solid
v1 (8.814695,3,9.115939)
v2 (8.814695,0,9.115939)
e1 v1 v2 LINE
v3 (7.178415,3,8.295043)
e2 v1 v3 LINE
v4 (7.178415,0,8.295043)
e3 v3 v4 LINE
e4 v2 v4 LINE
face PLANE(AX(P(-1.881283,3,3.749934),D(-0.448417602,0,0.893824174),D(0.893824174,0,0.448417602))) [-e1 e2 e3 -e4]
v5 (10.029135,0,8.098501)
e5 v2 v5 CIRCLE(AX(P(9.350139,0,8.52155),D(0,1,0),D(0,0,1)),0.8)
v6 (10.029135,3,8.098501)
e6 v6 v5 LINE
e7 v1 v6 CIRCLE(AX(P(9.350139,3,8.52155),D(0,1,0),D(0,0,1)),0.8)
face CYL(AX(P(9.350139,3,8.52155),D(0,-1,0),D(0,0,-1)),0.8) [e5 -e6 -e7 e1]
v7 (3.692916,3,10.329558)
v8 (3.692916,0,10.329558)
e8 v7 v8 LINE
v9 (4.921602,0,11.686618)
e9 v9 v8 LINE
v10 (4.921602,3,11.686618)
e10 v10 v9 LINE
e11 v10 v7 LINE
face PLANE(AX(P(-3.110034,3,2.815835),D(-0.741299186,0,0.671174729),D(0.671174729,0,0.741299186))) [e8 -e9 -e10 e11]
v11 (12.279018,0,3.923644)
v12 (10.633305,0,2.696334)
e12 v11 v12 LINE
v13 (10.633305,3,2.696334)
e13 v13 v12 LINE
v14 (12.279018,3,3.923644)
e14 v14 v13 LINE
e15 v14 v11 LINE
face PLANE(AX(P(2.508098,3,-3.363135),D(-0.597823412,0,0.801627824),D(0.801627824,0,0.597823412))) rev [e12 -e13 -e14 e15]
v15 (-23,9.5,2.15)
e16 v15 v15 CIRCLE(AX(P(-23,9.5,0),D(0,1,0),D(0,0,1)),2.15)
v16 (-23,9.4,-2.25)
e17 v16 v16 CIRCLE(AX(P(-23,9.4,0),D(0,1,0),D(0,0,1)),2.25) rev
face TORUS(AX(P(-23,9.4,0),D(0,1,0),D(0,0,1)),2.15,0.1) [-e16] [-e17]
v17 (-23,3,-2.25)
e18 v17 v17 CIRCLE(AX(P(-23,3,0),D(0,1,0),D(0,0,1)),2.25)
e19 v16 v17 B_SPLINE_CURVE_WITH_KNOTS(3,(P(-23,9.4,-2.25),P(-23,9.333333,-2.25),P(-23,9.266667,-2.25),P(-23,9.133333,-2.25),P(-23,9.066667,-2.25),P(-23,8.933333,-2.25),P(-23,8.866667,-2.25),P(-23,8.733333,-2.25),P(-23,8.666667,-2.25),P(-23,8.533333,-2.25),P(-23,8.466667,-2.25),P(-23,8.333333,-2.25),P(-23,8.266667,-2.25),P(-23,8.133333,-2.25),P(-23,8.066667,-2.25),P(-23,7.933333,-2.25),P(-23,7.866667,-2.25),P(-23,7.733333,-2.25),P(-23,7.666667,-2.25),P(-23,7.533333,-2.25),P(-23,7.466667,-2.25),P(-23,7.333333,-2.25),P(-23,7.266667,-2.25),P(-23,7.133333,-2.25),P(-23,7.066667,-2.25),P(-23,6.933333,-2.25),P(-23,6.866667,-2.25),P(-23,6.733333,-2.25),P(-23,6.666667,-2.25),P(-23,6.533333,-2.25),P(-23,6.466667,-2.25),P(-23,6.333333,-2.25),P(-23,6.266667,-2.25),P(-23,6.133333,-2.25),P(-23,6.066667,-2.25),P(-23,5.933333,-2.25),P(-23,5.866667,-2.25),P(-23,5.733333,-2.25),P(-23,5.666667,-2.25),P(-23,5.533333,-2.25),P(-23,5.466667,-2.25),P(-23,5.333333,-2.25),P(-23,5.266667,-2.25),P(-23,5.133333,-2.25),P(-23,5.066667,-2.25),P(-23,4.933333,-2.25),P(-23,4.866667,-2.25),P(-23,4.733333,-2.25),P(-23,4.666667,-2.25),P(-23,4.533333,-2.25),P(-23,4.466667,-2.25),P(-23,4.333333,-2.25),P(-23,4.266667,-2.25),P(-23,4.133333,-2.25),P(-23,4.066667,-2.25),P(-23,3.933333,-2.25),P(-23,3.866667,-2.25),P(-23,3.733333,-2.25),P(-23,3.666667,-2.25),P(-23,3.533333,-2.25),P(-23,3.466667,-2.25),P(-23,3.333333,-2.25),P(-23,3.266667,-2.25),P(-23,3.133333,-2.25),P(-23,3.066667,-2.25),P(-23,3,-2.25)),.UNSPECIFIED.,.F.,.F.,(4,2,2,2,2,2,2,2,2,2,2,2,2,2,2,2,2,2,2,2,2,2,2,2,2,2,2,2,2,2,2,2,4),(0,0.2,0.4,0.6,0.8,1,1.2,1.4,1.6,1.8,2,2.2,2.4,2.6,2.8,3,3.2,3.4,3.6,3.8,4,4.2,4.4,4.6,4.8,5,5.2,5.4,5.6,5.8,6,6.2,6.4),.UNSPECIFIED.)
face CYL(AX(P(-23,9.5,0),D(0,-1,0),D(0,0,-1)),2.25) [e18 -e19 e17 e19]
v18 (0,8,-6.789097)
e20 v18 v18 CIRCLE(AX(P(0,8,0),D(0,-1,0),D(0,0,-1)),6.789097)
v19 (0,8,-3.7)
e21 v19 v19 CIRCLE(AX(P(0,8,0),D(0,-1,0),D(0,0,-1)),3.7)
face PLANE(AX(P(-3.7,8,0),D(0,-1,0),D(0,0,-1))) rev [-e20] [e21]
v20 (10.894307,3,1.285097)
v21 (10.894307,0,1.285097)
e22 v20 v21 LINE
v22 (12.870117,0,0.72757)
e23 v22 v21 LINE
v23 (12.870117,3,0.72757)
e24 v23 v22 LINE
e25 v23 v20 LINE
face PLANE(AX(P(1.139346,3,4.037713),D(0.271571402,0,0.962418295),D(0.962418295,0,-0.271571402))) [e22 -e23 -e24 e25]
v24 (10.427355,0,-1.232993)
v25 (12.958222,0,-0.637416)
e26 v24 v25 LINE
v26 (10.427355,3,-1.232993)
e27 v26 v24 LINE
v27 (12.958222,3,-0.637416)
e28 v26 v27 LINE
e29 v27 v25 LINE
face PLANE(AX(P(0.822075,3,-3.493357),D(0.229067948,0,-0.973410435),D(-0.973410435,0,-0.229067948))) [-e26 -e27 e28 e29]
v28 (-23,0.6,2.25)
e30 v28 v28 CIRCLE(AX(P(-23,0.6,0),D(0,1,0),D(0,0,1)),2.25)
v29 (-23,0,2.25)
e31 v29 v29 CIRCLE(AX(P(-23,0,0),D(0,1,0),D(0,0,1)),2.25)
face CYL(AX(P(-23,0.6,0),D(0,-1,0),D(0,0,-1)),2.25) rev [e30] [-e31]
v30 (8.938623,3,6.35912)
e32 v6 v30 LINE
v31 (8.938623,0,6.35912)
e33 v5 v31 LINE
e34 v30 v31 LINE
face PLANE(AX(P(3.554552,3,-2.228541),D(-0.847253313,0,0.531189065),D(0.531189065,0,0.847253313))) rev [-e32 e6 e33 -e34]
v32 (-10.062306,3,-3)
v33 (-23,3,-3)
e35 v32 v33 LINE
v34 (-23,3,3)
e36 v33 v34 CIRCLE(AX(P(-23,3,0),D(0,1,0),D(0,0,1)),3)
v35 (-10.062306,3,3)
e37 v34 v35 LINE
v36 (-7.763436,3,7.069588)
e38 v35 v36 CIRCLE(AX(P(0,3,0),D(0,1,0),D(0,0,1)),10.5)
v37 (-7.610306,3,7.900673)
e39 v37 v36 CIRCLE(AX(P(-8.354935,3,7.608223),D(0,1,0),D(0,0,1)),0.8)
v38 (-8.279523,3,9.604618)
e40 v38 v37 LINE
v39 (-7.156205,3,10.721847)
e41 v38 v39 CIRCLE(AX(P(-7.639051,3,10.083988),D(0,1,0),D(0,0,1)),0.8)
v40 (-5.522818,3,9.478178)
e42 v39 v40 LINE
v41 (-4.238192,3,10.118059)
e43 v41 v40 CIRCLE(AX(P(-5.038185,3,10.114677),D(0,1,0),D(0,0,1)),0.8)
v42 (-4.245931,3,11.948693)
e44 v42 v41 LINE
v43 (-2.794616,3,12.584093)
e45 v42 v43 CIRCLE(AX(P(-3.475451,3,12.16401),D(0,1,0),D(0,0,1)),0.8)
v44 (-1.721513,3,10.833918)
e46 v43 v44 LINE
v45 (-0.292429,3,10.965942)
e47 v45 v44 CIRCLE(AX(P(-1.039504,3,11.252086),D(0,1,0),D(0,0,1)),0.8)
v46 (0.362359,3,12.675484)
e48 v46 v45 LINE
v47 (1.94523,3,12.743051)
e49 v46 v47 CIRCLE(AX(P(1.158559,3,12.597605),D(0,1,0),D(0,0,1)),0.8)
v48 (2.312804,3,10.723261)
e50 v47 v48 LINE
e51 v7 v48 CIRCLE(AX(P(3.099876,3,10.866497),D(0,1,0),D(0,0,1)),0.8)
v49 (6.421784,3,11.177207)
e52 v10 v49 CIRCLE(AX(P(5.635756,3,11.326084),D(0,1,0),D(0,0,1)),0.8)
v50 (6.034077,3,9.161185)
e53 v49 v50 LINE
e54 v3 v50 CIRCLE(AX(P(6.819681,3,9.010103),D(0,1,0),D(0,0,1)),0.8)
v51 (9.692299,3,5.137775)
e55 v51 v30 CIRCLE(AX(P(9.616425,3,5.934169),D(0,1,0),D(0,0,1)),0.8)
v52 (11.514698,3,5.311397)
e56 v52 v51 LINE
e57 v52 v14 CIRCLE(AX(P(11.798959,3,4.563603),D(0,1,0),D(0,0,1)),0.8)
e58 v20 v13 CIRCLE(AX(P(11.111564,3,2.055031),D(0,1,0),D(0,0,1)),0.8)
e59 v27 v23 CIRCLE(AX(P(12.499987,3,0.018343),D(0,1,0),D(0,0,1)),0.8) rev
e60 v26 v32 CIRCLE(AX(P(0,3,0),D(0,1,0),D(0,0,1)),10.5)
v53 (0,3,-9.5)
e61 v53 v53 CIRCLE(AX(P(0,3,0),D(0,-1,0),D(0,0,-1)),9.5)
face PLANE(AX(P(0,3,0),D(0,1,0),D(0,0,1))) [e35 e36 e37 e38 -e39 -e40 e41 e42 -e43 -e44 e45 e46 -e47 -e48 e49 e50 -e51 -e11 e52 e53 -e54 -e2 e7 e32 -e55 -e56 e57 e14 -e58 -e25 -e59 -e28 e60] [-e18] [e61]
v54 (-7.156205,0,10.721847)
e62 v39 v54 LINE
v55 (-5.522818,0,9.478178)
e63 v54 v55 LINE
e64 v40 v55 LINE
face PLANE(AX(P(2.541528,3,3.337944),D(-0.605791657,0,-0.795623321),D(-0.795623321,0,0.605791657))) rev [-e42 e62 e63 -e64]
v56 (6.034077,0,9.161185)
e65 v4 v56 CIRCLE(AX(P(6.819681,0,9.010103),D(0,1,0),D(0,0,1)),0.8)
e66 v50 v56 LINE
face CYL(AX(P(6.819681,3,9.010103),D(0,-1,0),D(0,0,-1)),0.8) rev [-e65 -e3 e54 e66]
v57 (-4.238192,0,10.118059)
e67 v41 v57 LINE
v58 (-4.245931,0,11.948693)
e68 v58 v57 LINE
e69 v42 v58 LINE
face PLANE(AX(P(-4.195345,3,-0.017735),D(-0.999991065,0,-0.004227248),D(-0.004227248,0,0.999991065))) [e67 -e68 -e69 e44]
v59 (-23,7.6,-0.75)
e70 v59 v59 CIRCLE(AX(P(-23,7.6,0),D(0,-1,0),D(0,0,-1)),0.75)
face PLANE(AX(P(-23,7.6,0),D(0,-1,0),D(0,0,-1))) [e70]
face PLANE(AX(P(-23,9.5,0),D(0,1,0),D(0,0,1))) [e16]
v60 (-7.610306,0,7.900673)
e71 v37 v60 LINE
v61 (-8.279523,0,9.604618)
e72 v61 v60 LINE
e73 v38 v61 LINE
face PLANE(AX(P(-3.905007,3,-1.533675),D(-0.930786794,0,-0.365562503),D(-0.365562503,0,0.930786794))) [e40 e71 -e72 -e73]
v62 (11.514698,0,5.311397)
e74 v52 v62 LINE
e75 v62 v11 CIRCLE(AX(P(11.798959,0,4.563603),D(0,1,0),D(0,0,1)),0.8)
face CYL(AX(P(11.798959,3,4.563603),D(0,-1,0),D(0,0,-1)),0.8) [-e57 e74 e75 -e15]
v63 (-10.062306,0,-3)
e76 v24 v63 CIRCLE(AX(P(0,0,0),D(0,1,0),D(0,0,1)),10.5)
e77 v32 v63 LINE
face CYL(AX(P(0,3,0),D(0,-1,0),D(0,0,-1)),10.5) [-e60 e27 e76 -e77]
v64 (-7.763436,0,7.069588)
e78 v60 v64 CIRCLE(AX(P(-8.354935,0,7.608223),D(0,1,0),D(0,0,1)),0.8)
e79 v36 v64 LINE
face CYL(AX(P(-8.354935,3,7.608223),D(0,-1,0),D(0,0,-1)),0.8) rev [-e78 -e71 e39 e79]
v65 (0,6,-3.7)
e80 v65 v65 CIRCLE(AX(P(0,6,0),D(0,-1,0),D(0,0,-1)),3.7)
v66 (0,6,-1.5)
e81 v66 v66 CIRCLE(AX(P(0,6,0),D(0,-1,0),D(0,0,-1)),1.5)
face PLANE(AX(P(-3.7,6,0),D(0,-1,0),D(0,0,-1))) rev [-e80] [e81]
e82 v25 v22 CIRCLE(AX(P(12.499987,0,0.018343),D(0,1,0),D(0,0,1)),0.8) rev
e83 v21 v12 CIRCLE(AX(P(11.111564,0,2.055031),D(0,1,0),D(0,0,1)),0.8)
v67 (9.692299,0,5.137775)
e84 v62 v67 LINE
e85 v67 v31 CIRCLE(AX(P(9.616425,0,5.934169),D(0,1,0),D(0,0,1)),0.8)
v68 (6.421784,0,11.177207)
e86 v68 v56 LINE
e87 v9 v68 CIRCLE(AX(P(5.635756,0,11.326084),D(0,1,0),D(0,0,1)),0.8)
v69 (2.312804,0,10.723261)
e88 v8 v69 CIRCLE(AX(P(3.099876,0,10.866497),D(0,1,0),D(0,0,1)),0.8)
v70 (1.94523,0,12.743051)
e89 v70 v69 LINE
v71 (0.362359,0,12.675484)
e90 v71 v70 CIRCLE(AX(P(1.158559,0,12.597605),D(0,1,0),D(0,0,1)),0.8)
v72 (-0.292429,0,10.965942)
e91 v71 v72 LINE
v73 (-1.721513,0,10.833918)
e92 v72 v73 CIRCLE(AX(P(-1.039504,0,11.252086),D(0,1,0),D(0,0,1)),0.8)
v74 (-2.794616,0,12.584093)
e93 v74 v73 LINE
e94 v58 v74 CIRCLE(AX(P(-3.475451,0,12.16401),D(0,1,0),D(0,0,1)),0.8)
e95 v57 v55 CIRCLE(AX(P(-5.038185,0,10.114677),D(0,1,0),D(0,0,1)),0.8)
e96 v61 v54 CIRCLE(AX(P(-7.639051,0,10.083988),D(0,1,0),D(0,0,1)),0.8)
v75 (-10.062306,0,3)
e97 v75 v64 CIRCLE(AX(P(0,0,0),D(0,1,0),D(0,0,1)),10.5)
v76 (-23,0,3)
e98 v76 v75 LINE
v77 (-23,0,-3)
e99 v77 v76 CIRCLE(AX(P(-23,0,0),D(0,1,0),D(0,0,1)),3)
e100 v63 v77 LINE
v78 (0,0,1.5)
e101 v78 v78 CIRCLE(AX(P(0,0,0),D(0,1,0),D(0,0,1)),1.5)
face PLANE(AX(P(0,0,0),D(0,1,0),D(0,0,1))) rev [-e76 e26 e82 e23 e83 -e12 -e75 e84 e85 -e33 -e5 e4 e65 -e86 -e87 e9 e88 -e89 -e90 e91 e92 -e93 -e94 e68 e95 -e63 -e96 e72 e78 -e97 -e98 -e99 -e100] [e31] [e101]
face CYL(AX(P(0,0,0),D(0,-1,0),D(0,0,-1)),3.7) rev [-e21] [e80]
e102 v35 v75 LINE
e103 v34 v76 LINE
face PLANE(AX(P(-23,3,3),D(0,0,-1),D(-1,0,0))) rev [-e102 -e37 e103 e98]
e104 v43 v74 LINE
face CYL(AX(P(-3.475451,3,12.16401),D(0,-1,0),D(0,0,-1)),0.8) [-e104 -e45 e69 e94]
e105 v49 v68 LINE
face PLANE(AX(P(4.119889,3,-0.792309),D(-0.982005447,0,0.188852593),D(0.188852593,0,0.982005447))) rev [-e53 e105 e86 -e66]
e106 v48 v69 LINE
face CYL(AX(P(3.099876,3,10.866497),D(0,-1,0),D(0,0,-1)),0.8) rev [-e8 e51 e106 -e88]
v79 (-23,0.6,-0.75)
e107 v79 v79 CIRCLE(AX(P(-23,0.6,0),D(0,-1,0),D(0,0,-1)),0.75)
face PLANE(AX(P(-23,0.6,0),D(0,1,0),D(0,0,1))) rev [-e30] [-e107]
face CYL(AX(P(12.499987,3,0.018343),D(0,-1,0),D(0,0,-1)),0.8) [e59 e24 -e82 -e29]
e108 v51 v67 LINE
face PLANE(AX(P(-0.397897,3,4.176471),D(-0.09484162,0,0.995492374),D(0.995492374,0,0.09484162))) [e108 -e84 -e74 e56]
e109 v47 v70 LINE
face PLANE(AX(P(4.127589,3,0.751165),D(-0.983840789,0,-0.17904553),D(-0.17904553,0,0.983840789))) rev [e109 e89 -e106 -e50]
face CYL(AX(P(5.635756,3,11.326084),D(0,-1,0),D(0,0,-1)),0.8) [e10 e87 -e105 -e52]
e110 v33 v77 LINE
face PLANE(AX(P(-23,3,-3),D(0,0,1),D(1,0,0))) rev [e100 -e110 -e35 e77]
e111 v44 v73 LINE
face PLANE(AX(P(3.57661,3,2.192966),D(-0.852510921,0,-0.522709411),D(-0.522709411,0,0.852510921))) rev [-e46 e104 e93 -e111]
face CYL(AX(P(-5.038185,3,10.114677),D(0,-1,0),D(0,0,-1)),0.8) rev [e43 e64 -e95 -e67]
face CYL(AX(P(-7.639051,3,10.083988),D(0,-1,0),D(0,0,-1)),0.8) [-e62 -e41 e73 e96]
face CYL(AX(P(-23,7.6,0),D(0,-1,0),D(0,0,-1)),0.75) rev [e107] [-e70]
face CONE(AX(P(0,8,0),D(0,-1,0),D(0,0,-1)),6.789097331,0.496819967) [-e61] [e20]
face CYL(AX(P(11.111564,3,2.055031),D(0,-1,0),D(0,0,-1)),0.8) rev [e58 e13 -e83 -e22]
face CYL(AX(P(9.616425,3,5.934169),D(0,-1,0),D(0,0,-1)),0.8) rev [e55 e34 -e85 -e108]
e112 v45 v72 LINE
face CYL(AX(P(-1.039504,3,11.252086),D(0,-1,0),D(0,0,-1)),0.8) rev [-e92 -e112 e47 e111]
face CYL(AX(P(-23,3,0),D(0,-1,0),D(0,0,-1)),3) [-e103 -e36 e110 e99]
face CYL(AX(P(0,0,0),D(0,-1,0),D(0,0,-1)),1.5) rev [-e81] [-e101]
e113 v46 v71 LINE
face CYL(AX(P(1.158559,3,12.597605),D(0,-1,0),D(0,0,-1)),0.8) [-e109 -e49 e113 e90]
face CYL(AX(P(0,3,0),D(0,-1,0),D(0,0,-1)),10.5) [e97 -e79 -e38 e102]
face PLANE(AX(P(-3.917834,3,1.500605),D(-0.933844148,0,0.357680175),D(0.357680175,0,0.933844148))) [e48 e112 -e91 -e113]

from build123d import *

# Parameters (mm, degrees)
BOSS_EXTRUDE1_DEPTH = 3
BOSS_EXTRUDE2_DEPTH = 3
SKETCH3_R           = 2.25
BOSS_EXTRUDE3_DEPTH = 6.5
FILLET1_R           = 0.1
SKETCH6_R           = 1.5
CUT_EXTRUDE3_DEPTH  = 30.962406787
SKETCH7_R           = 2.25
CUT_EXTRUDE4_DEPTH  = 0.6
SKETCH8_R           = 0.75
CUT_EXTRUDE5_DEPTH  = 7


# Read off the part's stored shape, not the designer's step: Boss-Extrude2
with BuildPart() as part:
    # Sketch1 → Boss-Extrude1 (new body)
    with BuildSketch(Plane(origin=(0, 0, 0), x_dir=(1, 0, 0), z_dir=(0, 1, 0))):
        with BuildLine():
            Line((-23, 3), (-10.062305899, 3))
            ThreePointArc((-10.062305899, 3), (10.5, 0), (-10.062305899, -3))
            Line((-10.062305899, -3), (-23, -3))
            ThreePointArc((-23, -3), (-26, 0), (-23, 3))
        make_face()
    extrude(amount=BOSS_EXTRUDE1_DEPTH)

    # Boss-Extrude2 outline → Boss-Extrude2 (add)
    with BuildSketch(Plane(origin=(0, 0, 0), x_dir=(1, 0, 0), z_dir=(0, 1, 0))):
        with BuildLine():
            ThreePointArc((-5.522818211, -9.478178454), (-5.113524662, -9.318232563), (-4.681499231, -9.398593775))
            ThreePointArc((-4.681499231, -9.398593775), (-6.330495099, -8.377041948), (-7.763435591, -7.069587529))
            ThreePointArc((-7.763435591, -7.069587529), (-7.568178787, -7.463260843), (-7.61030601, -7.900672771))
            Line((-7.61030601, -7.900672771), (-8.279523298, -9.604618361))
            ThreePointArc((-8.279523298, -9.604618361), (-8.203196552, -10.651208986), (-7.156206429, -10.721844617))
            Line((-7.156206429, -10.721844617), (-5.522818211, -9.478178454))
        make_face()
        with BuildLine():
            ThreePointArc((-1.721512659, -10.833918126), (-1.397763446, -10.536788435), (-0.965920838, -10.455476887))
            ThreePointArc((-0.965920838, -10.455476887), (-2.872731946, -10.099376771), (-4.681499231, -9.398593775))
            ThreePointArc((-4.681499231, -9.398593775), (-4.357094721, -9.695015118), (-4.238192033, -10.118058909))
            Line((-4.238192033, -10.118058909), (-4.245930648, -11.948693352))
            ThreePointArc((-4.245930648, -11.948693352), (-3.796296521, -12.896853076), (-2.79461913, -12.584091002))
            Line((-2.79461913, -12.584091002), (-1.721512659, -10.833918126))
        make_face()
        with BuildLine():
            ThreePointArc((2.312803759, -10.723261005), (2.507193937, -10.329163724), (2.880407716, -10.097190272))
            ThreePointArc((2.880407716, -10.097190272), (0.973862068, -10.454740201), (-0.965920838, -10.455476887))
            ThreePointArc((-0.965920838, -10.455476887), (-0.556271486, -10.614522786), (-0.292428604, -10.965941515))
            Line((-0.292428604, -10.965941515), (0.362358895, -12.675484051))
            ThreePointArc((0.362358895, -12.675484051), (1.124441346, -13.396877181), (1.945226568, -12.7430505))
            Line((1.945226568, -12.7430505), (2.312803759, -10.723261005))
        make_face()
        with BuildLine():
            ThreePointArc((6.034076643, -9.161184796), (6.072796451, -8.723461012), (6.336866889, -8.372223004))
            ThreePointArc((6.336866889, -8.372223004), (4.688647545, -9.39502976), (2.880407716, -10.097190272))
            ThreePointArc((2.880407716, -10.097190272), (3.319847778, -10.097333864), (3.692915739, -10.329557645))
            Line((3.692915739, -10.329557645), (4.921602293, -11.686617593))
            ThreePointArc((4.921602293, -11.686617593), (5.892983381, -12.083601839), (6.421781187, -11.177207559))
            Line((6.421781187, -11.177207559), (6.034076643, -9.161184796))
        make_face()
        with BuildLine():
            ThreePointArc((8.938622786, -6.359120261), (8.816430498, -5.937014916), (8.935616531, -5.514050889))
            ThreePointArc((8.935616531, -5.514050889), (7.768814222, -7.063676492), (6.336866889, -8.372223004))
            ThreePointArc((6.336866889, -8.372223004), (6.746618445, -8.213446044), (7.178415082, -8.295043382))
            Line((7.178415082, -8.295043382), (8.814695021, -9.115939424))
            ThreePointArc((8.814695021, -9.115939424), (9.863895986, -9.134782017), (10.029132325, -8.098502778))
            Line((10.029132325, -8.098502778), (8.938622786, -6.359120261))
        make_face()
        with BuildLine():
            ThreePointArc((10.633304904, -2.696333552), (10.366740607, -2.346987899), (10.324902114, -1.909553962))
            ThreePointArc((10.324902114, -1.909553962), (9.797448349, -3.776242293), (8.935616531, -5.514050889))
            ThreePointArc((8.935616531, -5.514050889), (9.260219543, -5.217846902), (9.692298733, -5.13777511))
            Line((9.692298733, -5.13777511), (11.514697643, -5.311396998))
            ThreePointArc((11.514697643, -5.311396998), (12.499706621, -4.949547548), (12.279016357, -3.923646229))
            Line((12.279016357, -3.923646229), (10.633304904, -2.696333552))
        make_face()
        with BuildLine():
            Line((12.95822192, 0.637416485), (10.427354789, 1.23299315))
            ThreePointArc((10.427354789, 1.23299315), (10.49442434, -0.342137064), (10.324902114, -1.909553962))
            ThreePointArc((10.324902114, -1.909553962), (10.520420766, -1.516004291), (10.894306512, -1.285096658))
            Line((10.894306512, -1.285096658), (12.870116963, -0.727570251))
            ThreePointArc((12.870116963, -0.727570251), (13.298325237, -0.06987275), (12.95822192, 0.637416485))
        make_face()
    extrude(amount=BOSS_EXTRUDE2_DEPTH)

    # Sketch5 → Revolve1 (revolve)
    with BuildSketch(Plane.XY, mode=Mode.PRIVATE) as revolve1_sk:
        Polygon((-3.7, 8), (-6.789097331, 8), (-9.5, 3), (-1.5, 3), (-1.5, 6), (-3.7, 6), align=None)
    revolve(revolve1_sk.sketch.rotate(Axis((0, 0, 0), (0, 1, 0)), 270), axis=Axis((0, 0, 0), (0, 1, 0)))

    # Sketch3 → Boss-Extrude3 (add)
    with BuildSketch(Plane(origin=(0, 3, 0), x_dir=(1, 0, 0), z_dir=(0, 1, 0))):
        with Locations(Location((-23, 0, 0), (0, 0, 90))):
            Circle(SKETCH3_R)
    extrude(amount=BOSS_EXTRUDE3_DEPTH)

    # Fillet1
    fillet1_edges = [part.edges().sort_by_distance(p)[0] for p in [
        (-23, 9.5, 2.25),
    ]]
    fillet(fillet1_edges, radius=FILLET1_R)

    # Sketch6 → Cut-Extrude3 (cut, through all)
    with BuildSketch(Plane(origin=(0, 3, 0), x_dir=(1, 0, 0), z_dir=(0, 1, 0))):
        with Locations(Location((0, 0, 0), (0, 0, 90))):
            Circle(SKETCH6_R)
    extrude(amount=-CUT_EXTRUDE3_DEPTH, mode=Mode.SUBTRACT)

    # Sketch7 → Cut-Extrude4 (cut)
    with BuildSketch(Plane(origin=(0, 0, 0), x_dir=(1, 0, 0), z_dir=(0, 1, 0))):
        with Locations(Location((-23, 0, 0), (0, 0, 90))):
            Circle(SKETCH7_R)
    extrude(amount=CUT_EXTRUDE4_DEPTH, mode=Mode.SUBTRACT)

    # Sketch8 → Cut-Extrude5 (cut)
    with BuildSketch(Plane.XZ.offset(-0.6)):
        with Locations(Location((-23, 0, 0), (0, 0, 270))):
            Circle(SKETCH8_R)
    extrude(amount=-CUT_EXTRUDE5_DEPTH, mode=Mode.SUBTRACT)


solid = part.part
